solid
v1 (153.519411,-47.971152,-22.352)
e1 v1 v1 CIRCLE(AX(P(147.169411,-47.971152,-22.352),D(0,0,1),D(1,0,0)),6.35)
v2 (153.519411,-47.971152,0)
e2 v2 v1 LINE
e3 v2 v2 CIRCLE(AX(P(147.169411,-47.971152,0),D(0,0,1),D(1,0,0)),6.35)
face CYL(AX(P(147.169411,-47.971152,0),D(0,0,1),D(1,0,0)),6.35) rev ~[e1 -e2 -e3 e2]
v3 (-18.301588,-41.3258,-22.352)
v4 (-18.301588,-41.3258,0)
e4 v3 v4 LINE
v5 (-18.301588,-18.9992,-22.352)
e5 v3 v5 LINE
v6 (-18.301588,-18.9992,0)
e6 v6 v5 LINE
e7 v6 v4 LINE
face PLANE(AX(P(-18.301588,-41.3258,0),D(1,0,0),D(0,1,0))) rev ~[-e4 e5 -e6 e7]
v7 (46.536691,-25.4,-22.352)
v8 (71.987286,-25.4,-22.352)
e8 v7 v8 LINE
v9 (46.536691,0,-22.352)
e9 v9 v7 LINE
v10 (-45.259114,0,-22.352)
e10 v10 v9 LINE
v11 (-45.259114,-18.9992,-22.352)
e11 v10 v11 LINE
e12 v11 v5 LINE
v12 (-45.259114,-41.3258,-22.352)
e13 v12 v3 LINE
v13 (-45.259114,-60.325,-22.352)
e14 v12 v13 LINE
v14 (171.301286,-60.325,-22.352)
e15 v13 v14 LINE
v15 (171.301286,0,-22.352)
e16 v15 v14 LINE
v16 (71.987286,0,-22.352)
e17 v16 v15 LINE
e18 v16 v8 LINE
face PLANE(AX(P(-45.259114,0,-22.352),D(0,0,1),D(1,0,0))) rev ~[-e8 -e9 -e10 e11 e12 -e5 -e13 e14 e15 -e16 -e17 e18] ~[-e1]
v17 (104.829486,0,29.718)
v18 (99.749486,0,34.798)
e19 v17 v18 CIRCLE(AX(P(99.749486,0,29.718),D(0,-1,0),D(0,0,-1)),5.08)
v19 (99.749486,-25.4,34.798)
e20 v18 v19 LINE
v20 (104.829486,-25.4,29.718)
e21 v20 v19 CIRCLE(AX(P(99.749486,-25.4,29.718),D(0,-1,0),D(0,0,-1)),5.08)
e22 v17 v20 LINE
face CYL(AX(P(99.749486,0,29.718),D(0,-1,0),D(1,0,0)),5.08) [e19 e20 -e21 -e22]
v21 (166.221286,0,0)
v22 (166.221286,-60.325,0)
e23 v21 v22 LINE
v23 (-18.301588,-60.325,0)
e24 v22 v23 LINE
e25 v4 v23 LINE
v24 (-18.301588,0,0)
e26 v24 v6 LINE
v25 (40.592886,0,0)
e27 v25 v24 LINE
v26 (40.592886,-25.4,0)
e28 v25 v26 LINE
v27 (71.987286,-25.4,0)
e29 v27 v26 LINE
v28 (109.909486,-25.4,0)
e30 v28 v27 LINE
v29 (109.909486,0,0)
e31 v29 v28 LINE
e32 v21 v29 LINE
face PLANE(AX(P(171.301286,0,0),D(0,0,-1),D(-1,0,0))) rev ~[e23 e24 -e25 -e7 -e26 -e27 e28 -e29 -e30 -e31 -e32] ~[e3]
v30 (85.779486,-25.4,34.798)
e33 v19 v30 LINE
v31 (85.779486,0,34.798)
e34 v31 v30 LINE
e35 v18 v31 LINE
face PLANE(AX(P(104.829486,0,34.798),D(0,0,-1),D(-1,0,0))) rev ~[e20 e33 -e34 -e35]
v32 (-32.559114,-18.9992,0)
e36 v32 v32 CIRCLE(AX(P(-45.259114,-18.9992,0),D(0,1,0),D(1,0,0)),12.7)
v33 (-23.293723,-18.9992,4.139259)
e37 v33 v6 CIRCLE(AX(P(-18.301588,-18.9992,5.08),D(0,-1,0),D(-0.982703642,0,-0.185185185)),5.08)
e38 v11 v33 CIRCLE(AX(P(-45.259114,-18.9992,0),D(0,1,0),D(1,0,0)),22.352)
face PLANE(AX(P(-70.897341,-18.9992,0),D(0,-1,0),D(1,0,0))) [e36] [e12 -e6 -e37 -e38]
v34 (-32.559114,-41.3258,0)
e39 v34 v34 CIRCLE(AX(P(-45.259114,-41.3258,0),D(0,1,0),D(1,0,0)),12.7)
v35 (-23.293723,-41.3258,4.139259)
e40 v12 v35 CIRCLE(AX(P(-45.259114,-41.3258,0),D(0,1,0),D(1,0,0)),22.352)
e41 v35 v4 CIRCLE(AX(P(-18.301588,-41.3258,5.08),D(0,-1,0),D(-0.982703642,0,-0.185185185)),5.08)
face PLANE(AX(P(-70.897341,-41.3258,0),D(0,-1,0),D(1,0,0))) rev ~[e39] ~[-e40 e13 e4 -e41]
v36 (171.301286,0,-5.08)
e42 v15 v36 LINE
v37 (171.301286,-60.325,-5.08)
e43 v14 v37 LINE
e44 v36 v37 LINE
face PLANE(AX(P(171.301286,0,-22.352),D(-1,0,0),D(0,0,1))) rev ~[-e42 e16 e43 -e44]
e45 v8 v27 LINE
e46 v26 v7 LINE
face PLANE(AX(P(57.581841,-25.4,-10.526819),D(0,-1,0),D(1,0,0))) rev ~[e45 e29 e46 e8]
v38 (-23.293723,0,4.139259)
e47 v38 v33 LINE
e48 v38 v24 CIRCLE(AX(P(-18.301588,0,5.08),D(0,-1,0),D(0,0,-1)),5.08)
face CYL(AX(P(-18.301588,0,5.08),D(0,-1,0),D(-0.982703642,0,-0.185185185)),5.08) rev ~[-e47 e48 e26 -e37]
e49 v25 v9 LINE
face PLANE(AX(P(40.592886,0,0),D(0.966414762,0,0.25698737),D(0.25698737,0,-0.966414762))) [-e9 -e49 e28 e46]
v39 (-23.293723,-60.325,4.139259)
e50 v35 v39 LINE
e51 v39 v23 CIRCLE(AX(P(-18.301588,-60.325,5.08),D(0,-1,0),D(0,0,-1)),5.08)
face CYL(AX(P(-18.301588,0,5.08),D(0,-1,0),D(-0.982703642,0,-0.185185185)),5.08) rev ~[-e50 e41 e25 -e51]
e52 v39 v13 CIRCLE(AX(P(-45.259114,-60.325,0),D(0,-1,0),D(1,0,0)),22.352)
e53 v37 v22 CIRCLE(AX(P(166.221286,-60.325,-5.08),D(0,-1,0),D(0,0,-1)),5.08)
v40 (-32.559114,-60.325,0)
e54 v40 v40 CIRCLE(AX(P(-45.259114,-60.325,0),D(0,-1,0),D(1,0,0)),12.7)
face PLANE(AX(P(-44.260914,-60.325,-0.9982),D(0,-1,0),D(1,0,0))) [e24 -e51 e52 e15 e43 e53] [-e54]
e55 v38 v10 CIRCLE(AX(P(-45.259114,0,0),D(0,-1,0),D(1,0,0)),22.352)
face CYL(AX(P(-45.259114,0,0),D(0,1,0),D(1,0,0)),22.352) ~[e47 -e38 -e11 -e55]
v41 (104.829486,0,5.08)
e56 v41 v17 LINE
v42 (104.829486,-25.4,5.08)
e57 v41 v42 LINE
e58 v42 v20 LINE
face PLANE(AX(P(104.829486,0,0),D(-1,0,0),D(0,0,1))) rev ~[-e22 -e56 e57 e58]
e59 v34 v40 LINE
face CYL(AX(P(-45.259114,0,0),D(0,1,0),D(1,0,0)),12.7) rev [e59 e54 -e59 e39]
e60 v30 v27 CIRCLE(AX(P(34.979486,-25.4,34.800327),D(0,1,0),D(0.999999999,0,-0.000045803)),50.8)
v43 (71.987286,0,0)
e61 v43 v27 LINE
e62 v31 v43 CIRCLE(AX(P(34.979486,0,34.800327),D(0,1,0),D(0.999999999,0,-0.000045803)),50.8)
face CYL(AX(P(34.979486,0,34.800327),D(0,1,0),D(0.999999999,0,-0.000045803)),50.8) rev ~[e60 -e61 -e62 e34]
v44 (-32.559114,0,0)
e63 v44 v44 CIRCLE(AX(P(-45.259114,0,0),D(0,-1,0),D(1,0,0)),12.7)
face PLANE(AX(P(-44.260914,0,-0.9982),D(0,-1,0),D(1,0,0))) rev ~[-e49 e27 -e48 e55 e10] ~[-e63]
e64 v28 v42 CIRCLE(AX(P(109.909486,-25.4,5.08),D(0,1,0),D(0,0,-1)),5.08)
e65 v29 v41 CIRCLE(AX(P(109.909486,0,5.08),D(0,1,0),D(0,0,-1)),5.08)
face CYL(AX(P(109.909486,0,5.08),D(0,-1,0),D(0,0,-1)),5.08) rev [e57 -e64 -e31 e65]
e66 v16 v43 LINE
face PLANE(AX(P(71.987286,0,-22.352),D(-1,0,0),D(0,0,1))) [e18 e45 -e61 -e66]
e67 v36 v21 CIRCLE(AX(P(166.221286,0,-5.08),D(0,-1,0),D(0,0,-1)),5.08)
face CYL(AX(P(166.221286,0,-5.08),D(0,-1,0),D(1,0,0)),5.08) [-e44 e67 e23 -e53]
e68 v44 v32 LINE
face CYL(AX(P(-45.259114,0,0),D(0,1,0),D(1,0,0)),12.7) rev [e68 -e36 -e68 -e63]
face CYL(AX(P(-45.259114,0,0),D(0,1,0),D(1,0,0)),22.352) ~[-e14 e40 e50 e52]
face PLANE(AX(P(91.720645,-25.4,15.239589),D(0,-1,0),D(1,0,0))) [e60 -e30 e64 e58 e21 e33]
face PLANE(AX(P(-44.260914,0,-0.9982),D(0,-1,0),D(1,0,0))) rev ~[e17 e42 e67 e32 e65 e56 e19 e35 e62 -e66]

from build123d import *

# Parameters (mm, degrees)
F0_R     = 12.7
F1_DEPTH = 60.325
F2_R     = 5.08
F3_W     = 52.5957527157
F3_H     = 22.3266
F4_DEPTH = 25.908
F5_DEPTH = 25.4
F6_DEPTH = 25.4
F7_R     = 5.08
F8_R     = 6.35
F9_DEPTH = 25.4


with BuildPart() as f1:
    # F0 (on Front) → F1 (new body)
    with BuildSketch(Plane.XZ):
        with BuildLine():
            ThreePointArc((-45.2591143548, -22.352), (-29.4538635818, -15.8052507731), (-22.9071143548, 0))
            ThreePointArc((-22.9071143548, 0), (-61.0643651279, 15.8052507731), (-45.2591143548, -22.352))
        make_face()
        with Locations((-45.2591143548, 0)):
            Circle(F0_R, mode=Mode.SUBTRACT)
        Polygon((104.8294856452, 0), (71.9872856452, 0), (71.9872856452, -22.352), (171.3012856452, -22.352), (171.3012856452, 0), align=None)
        with BuildLine():
            Line((40.5928856452, 0), (-22.9071143548, 0))
            ThreePointArc((-22.9071143548, 0), (-29.4538635818, -15.8052507731), (-45.2591143548, -22.352))
            Line((-45.2591143548, -22.352), (46.5366914868, -22.352))
            Line((46.5366914868, -22.352), (40.5928856452, 0))
        make_face()
        Polygon((71.9872856452, 0), (40.5928856452, 0), (46.5366914868, -22.352), (71.9872856452, -22.352), align=None)
    extrude(amount=F1_DEPTH)

    # F2
    f2_edges = [f1.edges().sort_by_distance(p)[0] for p in [
        (-22.907114, -30.1625, 0),
        (171.301286, -30.1625, 0),
    ]]
    fillet(f2_edges, radius=F2_R)

    # F3 (on face) → F4 (cut, symmetric)
    with BuildSketch(Plane.XY):
        with Locations((-44.5994644167, -30.1625)):
            Rectangle(F3_W, F3_H)
    extrude(amount=F4_DEPTH, both=True, mode=Mode.SUBTRACT)

    # F0 (on Front) → F5 (join)
    with BuildSketch(Plane.XZ):
        with BuildLine():
            ThreePointArc((85.7794856452, 34.798), (82.2053010067, 16.0823576341), (71.9872856452, 0))
            Line((71.9872856452, 0), (104.8294856452, 0))
            Line((104.8294856452, 0), (104.8294856452, 34.798))
            Line((104.8294856452, 34.798), (85.7794856452, 34.798))
        make_face()
    extrude(amount=F5_DEPTH)

    # F0 (on Front) → F6 (cut)
    with BuildSketch(Plane.XZ):
        Polygon((71.9872856452, 0), (40.5928856452, 0), (46.5366914868, -22.352), (71.9872856452, -22.352), align=None)
    extrude(amount=F6_DEPTH, mode=Mode.SUBTRACT)

    # F7
    f7_edges = [f1.edges().sort_by_distance(p)[0] for p in [
        (104.829486, -12.7, 0),
        (104.829486, -12.7, 34.798),
    ]]
    fillet(f7_edges, radius=F7_R)

    # F8 (on face) → F9 (cut)
    with BuildSketch(Plane.XY):
        with Locations((147.1694111824, -47.9711517692)):
            Circle(F8_R)
    extrude(amount=-F9_DEPTH, mode=Mode.SUBTRACT)


solid = f1.part
